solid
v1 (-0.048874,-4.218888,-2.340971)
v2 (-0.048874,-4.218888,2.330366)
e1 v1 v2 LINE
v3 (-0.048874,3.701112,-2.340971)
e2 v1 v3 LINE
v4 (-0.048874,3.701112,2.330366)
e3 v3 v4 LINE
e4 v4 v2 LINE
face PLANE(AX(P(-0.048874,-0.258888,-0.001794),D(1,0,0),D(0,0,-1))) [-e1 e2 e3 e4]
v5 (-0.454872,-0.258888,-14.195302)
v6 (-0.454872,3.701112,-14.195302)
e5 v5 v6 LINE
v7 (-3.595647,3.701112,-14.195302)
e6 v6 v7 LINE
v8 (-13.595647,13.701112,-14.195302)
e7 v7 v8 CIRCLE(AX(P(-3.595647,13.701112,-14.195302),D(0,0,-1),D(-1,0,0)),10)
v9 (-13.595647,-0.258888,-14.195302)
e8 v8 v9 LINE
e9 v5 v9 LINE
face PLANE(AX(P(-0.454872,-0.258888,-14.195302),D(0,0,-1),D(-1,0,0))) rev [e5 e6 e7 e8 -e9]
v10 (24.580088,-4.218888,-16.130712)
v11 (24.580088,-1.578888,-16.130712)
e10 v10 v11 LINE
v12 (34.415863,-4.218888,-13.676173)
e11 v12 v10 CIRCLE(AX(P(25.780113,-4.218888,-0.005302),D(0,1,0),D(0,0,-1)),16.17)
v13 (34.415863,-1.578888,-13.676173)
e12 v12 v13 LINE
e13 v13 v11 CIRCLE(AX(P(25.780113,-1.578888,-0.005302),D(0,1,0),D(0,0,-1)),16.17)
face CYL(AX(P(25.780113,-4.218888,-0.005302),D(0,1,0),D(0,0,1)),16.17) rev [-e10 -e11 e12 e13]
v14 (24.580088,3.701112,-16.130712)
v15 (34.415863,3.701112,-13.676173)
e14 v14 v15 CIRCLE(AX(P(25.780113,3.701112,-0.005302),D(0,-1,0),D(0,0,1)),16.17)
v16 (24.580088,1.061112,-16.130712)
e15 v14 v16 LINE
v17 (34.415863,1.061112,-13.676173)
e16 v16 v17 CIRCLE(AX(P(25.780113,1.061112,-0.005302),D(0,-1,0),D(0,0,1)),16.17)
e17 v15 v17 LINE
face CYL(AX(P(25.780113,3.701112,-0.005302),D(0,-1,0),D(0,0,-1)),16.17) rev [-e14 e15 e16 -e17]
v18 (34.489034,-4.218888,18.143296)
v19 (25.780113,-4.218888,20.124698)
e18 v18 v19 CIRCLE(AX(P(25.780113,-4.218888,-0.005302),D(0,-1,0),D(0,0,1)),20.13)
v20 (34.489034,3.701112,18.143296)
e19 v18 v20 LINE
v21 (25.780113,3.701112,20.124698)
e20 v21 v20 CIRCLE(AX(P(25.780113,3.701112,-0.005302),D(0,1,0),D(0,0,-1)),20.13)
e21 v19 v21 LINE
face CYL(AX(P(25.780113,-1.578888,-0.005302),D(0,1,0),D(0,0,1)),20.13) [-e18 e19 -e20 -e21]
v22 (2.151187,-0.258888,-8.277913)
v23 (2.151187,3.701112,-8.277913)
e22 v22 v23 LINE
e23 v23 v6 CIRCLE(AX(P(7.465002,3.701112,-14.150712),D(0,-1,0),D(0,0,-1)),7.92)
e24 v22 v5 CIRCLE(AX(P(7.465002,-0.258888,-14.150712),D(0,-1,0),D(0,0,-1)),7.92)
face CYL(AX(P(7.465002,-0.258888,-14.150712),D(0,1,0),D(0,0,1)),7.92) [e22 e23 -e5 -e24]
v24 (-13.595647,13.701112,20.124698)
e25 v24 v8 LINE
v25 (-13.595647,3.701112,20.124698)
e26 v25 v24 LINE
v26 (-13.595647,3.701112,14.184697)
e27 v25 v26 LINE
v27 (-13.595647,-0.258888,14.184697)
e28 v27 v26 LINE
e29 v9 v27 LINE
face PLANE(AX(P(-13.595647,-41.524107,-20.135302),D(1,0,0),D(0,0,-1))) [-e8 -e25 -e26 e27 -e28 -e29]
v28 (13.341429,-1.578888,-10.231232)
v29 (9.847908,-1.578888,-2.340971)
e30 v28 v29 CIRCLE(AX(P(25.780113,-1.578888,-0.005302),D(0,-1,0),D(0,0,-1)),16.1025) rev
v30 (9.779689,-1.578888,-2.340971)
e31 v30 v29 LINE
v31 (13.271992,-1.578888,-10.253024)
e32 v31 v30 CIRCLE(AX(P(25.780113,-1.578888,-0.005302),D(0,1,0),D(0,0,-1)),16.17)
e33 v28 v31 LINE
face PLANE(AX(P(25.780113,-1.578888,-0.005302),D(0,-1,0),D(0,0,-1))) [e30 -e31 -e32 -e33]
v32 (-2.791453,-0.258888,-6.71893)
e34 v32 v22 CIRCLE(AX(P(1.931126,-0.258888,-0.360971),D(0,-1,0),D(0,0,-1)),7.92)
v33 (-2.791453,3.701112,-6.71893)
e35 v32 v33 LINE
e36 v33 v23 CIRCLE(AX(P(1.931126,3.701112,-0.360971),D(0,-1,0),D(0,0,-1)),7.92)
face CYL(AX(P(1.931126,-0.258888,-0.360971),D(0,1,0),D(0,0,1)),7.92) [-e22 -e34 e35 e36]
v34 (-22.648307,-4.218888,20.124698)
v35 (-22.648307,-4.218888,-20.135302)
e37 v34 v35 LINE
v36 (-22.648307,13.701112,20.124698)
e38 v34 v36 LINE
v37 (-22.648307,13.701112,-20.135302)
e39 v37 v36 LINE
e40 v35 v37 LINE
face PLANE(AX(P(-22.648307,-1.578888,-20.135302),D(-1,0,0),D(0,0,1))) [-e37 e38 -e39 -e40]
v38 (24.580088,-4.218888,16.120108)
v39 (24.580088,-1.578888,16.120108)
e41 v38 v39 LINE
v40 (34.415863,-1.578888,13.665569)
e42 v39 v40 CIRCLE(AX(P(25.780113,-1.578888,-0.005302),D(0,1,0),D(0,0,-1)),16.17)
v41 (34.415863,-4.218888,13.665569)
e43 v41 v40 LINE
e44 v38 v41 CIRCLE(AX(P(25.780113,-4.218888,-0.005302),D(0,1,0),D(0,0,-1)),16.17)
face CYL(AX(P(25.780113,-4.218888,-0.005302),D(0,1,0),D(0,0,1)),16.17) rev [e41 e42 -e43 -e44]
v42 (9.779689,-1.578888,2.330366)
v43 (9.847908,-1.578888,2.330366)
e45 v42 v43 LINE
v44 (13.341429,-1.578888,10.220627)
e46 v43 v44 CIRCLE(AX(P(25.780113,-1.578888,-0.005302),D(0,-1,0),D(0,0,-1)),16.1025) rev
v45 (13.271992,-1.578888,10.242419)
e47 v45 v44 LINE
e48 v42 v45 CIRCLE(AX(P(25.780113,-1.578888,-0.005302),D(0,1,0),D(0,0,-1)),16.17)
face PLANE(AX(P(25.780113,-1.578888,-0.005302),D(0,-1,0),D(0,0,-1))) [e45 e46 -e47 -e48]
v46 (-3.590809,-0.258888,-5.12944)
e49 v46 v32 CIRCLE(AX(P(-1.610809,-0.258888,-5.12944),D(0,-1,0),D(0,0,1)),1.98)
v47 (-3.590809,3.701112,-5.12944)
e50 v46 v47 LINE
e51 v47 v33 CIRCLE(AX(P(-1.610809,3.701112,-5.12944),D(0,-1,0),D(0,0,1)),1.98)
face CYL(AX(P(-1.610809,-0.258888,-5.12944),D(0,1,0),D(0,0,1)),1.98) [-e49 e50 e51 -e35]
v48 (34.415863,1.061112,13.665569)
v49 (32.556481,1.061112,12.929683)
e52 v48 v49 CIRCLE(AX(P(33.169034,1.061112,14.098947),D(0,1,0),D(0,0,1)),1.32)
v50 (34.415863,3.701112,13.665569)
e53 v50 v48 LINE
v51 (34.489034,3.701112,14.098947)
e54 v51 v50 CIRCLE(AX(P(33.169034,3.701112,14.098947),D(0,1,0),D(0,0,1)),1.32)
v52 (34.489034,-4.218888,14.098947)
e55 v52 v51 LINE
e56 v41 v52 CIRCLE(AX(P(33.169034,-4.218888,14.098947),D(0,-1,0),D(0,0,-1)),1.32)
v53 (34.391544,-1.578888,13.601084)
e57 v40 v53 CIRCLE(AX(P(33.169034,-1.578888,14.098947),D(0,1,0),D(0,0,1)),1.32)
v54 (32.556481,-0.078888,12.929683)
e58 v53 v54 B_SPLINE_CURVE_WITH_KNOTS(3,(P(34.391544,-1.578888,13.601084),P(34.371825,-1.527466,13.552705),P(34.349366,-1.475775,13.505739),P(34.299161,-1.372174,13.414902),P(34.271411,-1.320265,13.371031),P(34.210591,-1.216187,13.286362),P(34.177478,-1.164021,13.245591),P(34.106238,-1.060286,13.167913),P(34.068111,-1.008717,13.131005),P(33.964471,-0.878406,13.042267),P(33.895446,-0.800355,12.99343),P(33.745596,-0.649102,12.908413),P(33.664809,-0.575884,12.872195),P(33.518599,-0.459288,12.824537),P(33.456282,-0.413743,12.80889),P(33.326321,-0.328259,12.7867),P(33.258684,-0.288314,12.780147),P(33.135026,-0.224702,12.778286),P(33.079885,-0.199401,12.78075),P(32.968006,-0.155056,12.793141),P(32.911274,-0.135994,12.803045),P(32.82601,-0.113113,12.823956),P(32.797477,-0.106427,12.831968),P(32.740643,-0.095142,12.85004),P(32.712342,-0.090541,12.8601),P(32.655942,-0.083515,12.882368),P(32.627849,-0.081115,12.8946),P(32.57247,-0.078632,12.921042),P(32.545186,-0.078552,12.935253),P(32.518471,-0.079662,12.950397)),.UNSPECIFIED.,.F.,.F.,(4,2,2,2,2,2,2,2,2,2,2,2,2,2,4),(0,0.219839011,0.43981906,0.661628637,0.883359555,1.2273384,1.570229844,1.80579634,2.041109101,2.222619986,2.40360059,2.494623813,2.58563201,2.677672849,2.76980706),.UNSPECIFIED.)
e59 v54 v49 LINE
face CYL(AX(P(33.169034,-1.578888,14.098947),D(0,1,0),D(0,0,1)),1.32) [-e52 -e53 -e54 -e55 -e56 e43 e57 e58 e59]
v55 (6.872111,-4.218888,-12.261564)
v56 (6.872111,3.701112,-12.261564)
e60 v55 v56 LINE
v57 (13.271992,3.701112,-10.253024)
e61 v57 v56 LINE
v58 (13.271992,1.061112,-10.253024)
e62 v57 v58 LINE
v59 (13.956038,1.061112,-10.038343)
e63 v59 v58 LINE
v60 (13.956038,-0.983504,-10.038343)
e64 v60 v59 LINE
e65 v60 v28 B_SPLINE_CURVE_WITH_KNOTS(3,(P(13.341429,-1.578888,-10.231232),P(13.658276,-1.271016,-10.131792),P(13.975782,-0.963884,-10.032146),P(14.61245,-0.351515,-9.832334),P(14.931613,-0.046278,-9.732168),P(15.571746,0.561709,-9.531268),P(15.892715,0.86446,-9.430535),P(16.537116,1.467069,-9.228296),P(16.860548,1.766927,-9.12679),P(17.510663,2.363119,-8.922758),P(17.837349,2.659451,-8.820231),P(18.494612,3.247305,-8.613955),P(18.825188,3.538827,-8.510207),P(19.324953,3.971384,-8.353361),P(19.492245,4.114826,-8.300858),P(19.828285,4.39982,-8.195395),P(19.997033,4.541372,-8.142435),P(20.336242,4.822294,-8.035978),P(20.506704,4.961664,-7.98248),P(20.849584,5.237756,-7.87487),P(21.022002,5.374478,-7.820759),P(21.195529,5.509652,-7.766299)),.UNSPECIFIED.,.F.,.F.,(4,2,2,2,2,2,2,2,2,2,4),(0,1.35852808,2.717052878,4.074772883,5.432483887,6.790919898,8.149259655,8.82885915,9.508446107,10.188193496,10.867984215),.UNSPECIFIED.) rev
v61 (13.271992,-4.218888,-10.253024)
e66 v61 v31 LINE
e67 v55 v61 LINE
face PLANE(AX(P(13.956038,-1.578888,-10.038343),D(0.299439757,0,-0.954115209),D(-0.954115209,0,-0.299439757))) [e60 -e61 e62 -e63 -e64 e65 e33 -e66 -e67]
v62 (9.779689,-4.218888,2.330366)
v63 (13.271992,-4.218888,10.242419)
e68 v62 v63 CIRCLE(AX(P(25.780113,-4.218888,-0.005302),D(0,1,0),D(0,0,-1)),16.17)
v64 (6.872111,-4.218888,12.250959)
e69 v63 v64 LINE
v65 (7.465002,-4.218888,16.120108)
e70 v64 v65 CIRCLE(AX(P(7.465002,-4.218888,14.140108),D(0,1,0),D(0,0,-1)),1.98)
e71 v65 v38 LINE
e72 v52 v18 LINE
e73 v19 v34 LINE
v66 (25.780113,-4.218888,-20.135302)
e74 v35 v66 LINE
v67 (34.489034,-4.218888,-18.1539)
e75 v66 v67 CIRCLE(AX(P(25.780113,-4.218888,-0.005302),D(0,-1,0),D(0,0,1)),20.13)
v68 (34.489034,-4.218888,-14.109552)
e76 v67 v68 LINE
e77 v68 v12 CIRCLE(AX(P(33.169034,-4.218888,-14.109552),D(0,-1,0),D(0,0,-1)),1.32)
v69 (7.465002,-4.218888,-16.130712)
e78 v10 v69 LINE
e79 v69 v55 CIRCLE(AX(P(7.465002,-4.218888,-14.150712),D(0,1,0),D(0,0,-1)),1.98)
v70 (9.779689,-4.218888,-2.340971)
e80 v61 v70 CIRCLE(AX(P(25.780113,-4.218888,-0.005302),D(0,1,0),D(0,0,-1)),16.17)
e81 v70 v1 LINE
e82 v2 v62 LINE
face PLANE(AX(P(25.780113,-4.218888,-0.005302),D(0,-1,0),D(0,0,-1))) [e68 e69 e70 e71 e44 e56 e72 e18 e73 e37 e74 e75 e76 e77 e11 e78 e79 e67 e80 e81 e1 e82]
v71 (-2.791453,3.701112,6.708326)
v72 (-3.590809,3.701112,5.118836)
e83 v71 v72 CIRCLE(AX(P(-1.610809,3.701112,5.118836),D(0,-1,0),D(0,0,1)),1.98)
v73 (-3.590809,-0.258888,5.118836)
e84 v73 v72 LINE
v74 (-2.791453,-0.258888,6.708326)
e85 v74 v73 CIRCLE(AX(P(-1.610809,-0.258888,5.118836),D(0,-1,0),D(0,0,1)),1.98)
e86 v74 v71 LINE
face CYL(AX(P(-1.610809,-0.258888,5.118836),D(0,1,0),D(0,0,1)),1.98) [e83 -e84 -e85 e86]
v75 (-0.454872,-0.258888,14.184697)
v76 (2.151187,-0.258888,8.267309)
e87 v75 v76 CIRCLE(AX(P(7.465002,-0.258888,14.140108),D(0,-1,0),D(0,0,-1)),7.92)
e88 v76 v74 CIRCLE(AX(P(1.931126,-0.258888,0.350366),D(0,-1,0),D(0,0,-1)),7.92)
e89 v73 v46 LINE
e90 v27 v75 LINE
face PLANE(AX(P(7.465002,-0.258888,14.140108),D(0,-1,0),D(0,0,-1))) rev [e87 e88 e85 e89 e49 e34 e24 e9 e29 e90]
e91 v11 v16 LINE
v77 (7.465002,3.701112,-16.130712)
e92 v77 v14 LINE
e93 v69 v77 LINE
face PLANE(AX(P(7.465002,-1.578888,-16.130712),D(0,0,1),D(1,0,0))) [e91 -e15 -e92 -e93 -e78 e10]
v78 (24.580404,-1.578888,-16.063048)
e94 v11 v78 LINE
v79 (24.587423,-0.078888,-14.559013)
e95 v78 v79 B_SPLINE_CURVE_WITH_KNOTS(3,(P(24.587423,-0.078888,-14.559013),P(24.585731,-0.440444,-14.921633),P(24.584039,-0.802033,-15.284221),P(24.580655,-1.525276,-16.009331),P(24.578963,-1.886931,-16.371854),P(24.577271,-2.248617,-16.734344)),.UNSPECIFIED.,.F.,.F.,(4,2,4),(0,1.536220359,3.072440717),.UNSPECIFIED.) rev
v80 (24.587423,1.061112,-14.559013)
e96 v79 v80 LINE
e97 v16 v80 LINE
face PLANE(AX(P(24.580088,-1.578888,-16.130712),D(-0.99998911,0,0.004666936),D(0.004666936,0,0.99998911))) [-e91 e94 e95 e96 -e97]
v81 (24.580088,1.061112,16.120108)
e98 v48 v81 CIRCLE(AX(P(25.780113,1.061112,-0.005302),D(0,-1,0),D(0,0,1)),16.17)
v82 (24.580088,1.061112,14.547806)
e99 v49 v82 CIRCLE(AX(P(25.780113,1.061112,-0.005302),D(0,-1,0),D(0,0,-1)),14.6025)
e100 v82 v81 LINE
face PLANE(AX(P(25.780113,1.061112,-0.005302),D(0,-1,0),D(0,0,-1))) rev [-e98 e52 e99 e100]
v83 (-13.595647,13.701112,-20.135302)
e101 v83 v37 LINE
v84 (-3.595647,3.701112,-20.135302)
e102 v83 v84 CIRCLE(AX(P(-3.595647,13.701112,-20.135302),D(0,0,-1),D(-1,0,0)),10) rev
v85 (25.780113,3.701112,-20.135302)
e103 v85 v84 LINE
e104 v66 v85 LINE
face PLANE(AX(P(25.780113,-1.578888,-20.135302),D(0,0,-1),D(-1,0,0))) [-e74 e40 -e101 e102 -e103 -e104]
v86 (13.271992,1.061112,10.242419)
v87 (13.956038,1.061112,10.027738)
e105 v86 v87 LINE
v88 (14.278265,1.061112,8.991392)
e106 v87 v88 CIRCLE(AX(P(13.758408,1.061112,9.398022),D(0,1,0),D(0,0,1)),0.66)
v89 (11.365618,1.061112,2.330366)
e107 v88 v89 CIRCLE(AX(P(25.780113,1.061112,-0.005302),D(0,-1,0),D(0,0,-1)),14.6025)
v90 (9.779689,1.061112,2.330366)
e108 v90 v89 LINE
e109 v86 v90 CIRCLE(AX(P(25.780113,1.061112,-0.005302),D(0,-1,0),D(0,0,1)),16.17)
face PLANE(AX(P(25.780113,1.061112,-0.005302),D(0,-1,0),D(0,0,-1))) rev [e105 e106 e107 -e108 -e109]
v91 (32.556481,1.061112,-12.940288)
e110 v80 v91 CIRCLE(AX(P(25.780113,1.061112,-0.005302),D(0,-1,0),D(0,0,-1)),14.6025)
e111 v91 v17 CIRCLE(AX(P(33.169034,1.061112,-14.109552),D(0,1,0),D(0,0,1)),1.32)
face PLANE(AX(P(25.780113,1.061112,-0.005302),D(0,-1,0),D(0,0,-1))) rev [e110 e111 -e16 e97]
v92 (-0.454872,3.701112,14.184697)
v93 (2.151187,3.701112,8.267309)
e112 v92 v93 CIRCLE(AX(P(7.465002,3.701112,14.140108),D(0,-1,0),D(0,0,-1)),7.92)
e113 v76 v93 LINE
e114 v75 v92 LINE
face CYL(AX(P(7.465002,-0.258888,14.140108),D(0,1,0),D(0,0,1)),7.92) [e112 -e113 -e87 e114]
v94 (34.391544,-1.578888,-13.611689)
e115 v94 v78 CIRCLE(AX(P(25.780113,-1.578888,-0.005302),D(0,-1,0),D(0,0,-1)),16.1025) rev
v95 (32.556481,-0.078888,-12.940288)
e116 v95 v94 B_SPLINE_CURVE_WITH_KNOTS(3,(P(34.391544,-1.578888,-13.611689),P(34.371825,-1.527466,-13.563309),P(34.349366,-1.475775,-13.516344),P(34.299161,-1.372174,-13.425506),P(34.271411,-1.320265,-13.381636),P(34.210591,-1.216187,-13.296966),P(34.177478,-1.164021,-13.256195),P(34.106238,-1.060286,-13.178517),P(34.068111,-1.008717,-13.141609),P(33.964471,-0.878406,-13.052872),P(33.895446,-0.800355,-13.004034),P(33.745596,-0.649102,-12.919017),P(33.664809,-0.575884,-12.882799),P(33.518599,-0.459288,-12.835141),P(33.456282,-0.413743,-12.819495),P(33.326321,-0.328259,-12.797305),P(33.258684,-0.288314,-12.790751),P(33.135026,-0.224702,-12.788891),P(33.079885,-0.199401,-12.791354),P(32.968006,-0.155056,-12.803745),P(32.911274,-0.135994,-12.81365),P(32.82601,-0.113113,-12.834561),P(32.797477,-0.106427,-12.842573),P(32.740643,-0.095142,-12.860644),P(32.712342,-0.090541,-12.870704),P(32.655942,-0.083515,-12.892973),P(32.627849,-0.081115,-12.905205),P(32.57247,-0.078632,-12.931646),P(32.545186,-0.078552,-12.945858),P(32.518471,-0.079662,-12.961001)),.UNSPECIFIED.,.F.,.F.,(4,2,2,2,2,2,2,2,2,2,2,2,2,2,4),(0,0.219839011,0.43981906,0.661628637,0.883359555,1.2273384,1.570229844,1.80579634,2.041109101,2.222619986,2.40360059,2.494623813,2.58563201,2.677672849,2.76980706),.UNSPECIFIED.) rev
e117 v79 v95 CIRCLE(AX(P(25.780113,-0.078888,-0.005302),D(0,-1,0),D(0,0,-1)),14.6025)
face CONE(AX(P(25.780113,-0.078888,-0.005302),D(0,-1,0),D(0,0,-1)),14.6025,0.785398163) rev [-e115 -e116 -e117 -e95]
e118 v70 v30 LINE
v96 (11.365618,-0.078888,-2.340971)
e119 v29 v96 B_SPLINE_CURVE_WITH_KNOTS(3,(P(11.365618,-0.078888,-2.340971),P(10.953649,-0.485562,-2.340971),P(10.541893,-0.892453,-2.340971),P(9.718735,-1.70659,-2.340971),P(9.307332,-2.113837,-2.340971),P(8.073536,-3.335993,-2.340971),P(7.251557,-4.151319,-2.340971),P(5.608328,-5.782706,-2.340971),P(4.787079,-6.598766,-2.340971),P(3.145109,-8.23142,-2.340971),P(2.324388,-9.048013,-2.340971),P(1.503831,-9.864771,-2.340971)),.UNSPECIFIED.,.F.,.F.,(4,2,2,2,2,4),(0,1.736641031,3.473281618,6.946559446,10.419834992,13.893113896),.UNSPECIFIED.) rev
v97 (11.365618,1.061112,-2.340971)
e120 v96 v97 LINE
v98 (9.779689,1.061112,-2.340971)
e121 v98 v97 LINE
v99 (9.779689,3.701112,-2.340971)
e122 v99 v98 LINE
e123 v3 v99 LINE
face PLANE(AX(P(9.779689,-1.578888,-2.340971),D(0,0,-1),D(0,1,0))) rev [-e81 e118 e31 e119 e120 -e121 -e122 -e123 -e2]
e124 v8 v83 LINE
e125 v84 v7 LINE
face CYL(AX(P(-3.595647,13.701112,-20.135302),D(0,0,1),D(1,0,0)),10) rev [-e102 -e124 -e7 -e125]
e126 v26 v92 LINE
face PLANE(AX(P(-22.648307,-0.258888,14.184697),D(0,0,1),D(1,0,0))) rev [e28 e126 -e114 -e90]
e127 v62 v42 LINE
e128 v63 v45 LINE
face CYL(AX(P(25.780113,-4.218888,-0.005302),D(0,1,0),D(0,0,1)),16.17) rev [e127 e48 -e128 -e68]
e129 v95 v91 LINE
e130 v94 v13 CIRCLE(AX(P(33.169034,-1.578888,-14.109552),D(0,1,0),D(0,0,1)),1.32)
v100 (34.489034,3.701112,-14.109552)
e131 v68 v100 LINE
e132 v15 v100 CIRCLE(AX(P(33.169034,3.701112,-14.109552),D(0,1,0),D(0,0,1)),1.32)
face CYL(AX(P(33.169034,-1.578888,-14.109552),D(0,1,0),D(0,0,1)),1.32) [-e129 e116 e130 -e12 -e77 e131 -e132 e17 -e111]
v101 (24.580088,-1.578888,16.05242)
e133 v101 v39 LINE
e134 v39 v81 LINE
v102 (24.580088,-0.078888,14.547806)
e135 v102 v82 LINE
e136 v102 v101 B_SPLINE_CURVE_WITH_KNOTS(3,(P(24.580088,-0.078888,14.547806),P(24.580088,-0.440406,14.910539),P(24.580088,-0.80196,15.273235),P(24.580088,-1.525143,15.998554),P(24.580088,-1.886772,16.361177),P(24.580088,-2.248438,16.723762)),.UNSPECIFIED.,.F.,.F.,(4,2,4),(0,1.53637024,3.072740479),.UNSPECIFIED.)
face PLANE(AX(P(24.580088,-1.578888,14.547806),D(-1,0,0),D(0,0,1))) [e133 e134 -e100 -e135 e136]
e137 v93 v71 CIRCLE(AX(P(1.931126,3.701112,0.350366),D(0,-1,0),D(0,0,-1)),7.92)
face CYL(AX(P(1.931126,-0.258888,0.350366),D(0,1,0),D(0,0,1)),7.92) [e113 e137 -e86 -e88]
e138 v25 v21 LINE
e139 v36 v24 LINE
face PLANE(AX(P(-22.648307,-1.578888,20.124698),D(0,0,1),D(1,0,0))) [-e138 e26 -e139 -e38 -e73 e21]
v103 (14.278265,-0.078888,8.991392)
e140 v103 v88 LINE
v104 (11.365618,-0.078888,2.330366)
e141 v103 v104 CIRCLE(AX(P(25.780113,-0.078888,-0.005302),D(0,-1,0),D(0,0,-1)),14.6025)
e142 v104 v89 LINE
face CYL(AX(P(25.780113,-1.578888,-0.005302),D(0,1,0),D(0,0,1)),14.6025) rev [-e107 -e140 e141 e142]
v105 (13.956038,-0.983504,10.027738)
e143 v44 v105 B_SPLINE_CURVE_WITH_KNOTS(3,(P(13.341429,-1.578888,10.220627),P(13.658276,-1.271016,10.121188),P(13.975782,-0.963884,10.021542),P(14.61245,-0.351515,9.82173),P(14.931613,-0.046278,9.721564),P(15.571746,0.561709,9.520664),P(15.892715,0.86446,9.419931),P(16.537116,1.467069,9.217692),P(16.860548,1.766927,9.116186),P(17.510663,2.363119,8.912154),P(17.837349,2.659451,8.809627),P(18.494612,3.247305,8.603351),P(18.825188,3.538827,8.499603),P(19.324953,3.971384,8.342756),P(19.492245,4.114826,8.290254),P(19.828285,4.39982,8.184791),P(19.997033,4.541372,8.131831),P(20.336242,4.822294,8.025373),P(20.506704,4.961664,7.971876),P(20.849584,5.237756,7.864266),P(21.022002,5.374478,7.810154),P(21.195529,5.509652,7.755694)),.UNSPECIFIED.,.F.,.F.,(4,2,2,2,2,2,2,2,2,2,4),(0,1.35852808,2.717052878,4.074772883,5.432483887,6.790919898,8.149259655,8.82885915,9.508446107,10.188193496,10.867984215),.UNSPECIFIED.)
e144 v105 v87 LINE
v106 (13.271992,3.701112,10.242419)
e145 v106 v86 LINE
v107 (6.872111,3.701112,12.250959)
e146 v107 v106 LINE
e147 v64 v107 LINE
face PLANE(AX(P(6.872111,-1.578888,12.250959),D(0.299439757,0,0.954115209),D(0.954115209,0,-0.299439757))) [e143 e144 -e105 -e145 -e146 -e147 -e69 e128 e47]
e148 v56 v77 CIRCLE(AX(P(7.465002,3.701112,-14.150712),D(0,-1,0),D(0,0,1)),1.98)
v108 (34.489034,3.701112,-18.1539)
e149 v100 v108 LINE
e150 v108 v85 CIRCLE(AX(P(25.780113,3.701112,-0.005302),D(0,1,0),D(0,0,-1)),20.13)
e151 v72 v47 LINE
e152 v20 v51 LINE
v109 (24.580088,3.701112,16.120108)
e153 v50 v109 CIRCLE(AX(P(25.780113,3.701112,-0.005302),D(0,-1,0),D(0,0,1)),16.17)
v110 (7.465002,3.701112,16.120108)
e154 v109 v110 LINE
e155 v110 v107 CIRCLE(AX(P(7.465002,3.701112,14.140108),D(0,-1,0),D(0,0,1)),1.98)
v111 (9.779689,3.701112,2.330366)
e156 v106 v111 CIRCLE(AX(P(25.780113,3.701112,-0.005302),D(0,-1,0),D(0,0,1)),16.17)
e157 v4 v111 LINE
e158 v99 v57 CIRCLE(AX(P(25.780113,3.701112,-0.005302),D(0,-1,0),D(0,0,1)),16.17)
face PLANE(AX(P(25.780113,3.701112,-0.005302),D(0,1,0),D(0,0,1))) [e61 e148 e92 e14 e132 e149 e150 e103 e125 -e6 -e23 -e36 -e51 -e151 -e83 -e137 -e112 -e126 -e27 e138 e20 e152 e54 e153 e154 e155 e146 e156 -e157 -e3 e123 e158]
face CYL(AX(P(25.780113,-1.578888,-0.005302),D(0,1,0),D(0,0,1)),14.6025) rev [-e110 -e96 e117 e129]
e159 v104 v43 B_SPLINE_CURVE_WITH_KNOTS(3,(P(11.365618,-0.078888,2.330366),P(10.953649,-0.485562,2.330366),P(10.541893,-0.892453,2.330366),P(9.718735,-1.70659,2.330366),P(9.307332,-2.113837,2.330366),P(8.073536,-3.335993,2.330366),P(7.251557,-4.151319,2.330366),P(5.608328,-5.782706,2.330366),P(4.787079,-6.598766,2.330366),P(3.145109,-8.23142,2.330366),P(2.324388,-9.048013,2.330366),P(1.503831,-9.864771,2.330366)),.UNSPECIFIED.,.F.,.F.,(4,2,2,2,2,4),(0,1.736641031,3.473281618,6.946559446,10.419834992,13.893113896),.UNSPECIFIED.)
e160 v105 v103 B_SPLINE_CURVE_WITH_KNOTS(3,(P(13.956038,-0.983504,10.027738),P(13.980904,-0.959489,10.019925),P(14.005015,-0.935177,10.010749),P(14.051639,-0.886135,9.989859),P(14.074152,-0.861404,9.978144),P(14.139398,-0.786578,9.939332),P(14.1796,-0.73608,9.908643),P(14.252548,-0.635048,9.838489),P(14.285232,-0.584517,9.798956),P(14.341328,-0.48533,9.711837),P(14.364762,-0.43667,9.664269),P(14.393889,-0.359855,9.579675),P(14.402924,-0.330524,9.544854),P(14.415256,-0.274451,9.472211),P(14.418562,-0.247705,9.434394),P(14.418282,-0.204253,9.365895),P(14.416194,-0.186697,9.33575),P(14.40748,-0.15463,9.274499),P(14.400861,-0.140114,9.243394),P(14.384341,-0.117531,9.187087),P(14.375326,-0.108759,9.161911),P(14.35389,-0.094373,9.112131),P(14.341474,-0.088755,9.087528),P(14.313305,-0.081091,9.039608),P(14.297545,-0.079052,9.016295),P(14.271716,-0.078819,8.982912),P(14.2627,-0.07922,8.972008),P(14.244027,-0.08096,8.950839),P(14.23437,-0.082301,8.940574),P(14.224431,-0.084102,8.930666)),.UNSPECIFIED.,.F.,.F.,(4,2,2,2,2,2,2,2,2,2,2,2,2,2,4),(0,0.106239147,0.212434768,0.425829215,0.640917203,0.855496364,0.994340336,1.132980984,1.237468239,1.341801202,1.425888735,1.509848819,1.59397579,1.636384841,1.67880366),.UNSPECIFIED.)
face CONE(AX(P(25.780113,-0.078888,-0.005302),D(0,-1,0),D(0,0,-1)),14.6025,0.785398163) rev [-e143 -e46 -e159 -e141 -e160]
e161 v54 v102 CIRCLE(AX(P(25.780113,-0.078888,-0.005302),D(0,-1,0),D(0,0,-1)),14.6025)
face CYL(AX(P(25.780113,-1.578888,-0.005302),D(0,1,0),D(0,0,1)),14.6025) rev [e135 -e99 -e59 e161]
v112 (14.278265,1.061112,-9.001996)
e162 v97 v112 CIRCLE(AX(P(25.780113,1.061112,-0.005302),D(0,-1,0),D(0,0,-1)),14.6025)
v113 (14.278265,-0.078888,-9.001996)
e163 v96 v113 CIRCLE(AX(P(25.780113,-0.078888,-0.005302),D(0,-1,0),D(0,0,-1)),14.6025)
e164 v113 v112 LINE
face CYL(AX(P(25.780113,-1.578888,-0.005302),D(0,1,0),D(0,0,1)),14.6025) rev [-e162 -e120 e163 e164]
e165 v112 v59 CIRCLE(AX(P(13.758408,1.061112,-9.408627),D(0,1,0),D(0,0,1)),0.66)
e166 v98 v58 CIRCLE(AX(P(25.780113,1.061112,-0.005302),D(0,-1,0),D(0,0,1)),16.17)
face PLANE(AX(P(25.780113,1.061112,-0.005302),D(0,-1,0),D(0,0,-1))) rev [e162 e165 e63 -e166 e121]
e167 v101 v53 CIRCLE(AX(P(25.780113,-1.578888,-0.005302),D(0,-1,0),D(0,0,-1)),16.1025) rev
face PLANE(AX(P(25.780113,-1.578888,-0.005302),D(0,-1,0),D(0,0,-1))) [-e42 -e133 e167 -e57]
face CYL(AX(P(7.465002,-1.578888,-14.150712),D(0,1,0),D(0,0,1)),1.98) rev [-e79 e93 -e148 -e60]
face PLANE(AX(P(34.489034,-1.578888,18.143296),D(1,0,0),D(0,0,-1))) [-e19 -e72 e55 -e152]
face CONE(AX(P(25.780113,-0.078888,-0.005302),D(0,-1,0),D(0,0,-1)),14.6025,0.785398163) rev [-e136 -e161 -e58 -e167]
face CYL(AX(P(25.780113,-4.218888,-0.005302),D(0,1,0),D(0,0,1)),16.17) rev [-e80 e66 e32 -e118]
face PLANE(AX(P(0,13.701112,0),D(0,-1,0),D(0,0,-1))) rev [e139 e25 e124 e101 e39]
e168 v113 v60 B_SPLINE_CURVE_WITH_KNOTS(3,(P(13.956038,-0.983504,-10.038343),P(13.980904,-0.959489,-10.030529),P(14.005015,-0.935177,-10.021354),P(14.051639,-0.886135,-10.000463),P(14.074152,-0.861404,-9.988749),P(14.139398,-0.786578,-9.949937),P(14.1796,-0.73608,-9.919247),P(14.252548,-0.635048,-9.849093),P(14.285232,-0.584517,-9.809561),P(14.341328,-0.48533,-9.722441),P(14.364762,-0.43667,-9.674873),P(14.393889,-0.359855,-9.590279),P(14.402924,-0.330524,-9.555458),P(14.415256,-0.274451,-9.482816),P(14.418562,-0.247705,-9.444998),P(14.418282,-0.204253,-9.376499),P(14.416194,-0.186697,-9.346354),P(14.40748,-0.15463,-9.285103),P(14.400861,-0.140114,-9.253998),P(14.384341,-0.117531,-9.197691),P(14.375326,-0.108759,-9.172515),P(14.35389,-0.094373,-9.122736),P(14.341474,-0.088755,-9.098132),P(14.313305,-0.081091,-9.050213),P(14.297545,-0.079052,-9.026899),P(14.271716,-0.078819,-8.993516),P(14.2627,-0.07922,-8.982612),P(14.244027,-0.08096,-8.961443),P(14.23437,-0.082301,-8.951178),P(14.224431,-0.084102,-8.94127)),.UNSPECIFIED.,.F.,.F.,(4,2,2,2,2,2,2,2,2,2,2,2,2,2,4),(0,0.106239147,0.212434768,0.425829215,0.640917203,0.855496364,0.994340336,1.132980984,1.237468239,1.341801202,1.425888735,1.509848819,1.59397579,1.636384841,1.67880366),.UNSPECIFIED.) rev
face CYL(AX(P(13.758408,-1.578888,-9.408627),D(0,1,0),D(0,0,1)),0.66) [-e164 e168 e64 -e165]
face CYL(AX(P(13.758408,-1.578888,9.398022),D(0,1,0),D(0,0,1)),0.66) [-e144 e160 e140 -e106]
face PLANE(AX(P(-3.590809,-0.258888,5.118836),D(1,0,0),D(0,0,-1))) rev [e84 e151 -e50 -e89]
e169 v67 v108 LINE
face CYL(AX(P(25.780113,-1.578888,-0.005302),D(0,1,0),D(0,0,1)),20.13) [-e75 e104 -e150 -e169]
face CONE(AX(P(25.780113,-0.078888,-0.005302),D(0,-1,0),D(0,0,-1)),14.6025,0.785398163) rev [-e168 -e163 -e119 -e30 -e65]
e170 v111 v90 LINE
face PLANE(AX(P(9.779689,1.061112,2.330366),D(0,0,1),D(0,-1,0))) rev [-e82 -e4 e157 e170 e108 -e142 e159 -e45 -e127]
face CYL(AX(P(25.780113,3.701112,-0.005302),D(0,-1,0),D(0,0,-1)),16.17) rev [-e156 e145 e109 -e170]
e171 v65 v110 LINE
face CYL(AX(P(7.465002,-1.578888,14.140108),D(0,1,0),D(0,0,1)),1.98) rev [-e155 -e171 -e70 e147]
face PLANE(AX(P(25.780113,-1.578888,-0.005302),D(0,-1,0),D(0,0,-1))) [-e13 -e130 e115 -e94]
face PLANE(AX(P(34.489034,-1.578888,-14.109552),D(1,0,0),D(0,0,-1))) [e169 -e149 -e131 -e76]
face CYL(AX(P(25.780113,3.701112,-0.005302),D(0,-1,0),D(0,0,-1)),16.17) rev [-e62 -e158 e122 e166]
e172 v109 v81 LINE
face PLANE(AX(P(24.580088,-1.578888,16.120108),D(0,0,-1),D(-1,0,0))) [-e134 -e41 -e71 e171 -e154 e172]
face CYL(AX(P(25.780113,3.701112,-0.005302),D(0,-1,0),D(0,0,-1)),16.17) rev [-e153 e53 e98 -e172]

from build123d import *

# Parameters (mm, degrees)
BOSS_EXTRUDE1_DEPTH             = 4
SKETCH2_W                       = 7.077783737
SKETCH2_H                       = 4
CUT_EXTRUDE1_DEPTH              = 2.402922374
BOSS_EXTRUDE2_START             = 4
BOSS_EXTRUDE2_DEPTH             = 4
SKETCH4_W                       = 7.077783737
SKETCH4_H                       = 8
CUT_EXTRUDE2_DEPTH              = 14.891763442
BOSS_EXTRUDE3_DEPTH             = 4
CUT_EXTRUDE3_DEPTH              = 6
SCALE1_SCALE                    = 0.6
SCALE2_SCALE                    = 1.1
CHAMFER2_ANGLE                  = 32.170804
CHAMFER3_ANGLE                  = 32.170804
CHAMFER4_ANGLE                  = 37.089833
SKETCH9_W                       = 9.052660039
SKETCH9_H                       = 40.26
BOSS_EXTRUDE4_DEPTH             = 10
BOSS_EXTRUDE4_DIRECTION_2_REACH = 42.714
FILLET1_R                       = 10


with BuildPart() as part:
    # Sketch1 → Boss-Extrude1 (new body)
    with BuildSketch(Plane(origin=(0, 2, 0), x_dir=(1, 0, 0), z_dir=(0, 1, 0))):
        with BuildLine():
            Line((17.294685816, -3.533576913), (17.294685816, 3.544206824))
            ThreePointArc((17.294685816, 3.544206824), (18.863114644, 8.869467938), (21.707787317, 13.636669664))
            ThreePointArc((21.707787317, 13.636669664), (21.87503123, 14.549681712), (21.219564158, 15.2068913))
            Line((21.219564158, 15.2068913), (10.486342132, 18.5754084))
            ThreePointArc((10.486342132, 18.5754084), (8.419274676, 21.892156447), (11.384661403, 24.437754026))
            Line((11.384661403, 24.437754026), (37.31661015, 24.437754026))
            Line((37.31661015, 24.437754026), (37.327723934, 22.056391914))
            ThreePointArc((37.327723934, 22.056391914), (43.539057979, 21.687528752), (49.402053126, 19.603777671))
            ThreePointArc((49.402053126, 19.603777671), (51.365484655, 19.664217825), (52.33016375, 21.37539012))
            Line((52.33016375, 21.37539012), (52.33016375, 27.503190326))
            ThreePointArc((52.33016375, 27.503190326), (45.90109867, 29.745314945), (39.134829344, 30.505314955))
            Line((39.134829344, 30.505314955), (-34.24156443, 30.505314955))
            Line((-34.24156443, 30.505314955), (-34.24156443, -30.494685045))
            Line((-34.24156443, -30.494685045), (39.134829344, -30.494685045))
            ThreePointArc((39.134829344, -30.494685045), (45.90109867, -29.734685035), (52.33016375, -27.492560416))
            Line((52.33016375, -27.492560416), (52.33016375, -21.36476021))
            ThreePointArc((52.33016375, -21.36476021), (51.365484655, -19.653587914), (49.402053126, -19.593147761))
            ThreePointArc((49.402053126, -19.593147761), (43.533593788, -21.678008046), (37.31661015, -22.044848399))
            Line((37.31661015, -22.044848399), (37.31661015, -24.427124116))
            Line((37.31661015, -24.427124116), (11.384661403, -24.427124116))
            ThreePointArc((11.384661403, -24.427124116), (8.419274676, -21.881526536), (10.486342132, -18.564778489))
            Line((10.486342132, -18.564778489), (21.219564158, -15.19626139))
            ThreePointArc((21.219564158, -15.19626139), (21.87503123, -14.539051801), (21.707787317, -13.626039753))
            ThreePointArc((21.707787317, -13.626039753), (18.863114644, -8.858838027), (17.294685816, -3.533576913))
        make_face()
    extrude(amount=-BOSS_EXTRUDE1_DEPTH)

    # Sketch2 → Cut-Extrude1 (cut)
    with BuildSketch(Plane(origin=(17.294685816, 0, 0), x_dir=(0, 0, -1), z_dir=(1, 0, 0))):
        with Locations((0.005314956, 0)):
            Rectangle(SKETCH2_W, SKETCH2_H)
    extrude(amount=-CUT_EXTRUDE1_DEPTH, mode=Mode.SUBTRACT)

    # Sketch3 → Boss-Extrude2 (add)
    with BuildSketch(Plane(origin=(0, 2, 0), x_dir=(-1, 0, 0), z_dir=(0, 1, 0)).offset(BOSS_EXTRUDE2_START)):
        with BuildLine():
            Line((-14.891763442, -3.544206824), (-14.891763442, 3.533576913))
            ThreePointArc((-14.891763442, 3.533576913), (-16.721112086, 9.887878597), (-20.183130277, 15.52153606))
            Line((-20.183130277, 15.52153606), (-10.486342132, 18.564778489))
            ThreePointArc((-10.486342132, 18.564778489), (-8.419274676, 21.881526536), (-11.384661403, 24.427124116))
            Line((-11.384661403, 24.427124116), (-37.31661015, 24.427124116))
            ThreePointArc((-37.31661015, 24.427124116), (-45.066931496, 23.76567922), (-52.219299017, 20.708126414))
            ThreePointArc((-52.219299017, 20.708126414), (-52.302252812, 21.031796649), (-52.33016375, 21.36476021))
            Line((-52.33016375, 21.36476021), (-52.33016375, 27.492560416))
            ThreePointArc((-52.33016375, 27.492560416), (-45.90109867, 29.734685035), (-39.134829344, 30.494685045))
            Line((-39.134829344, 30.494685045), (34.241565294, 30.494685045))
            Line((34.241565294, 30.494685045), (34.241565294, -30.505314955))
            Line((34.241565294, -30.505314955), (-39.134829344, -30.505314955))
            ThreePointArc((-39.134829344, -30.505314955), (-45.90109867, -29.745314945), (-52.33016375, -27.503190326))
            Line((-52.33016375, -27.503190326), (-52.33016375, -21.37539012))
            ThreePointArc((-52.33016375, -21.37539012), (-52.302252812, -21.04242656), (-52.219299017, -20.718756325))
            ThreePointArc((-52.219299017, -20.718756325), (-45.066931496, -23.77630913), (-37.31661015, -24.437754026))
            Line((-37.31661015, -24.437754026), (-11.384661403, -24.437754026))
            ThreePointArc((-11.384661403, -24.437754026), (-8.419274676, -21.892156447), (-10.486342132, -18.5754084))
            Line((-10.486342132, -18.5754084), (-20.183130277, -15.53216597))
            ThreePointArc((-20.183130277, -15.53216597), (-16.721112086, -9.898508508), (-14.891763442, -3.544206824))
        make_face()
    extrude(amount=-BOSS_EXTRUDE2_DEPTH)

    # Sketch4 → Cut-Extrude2 (cut)
    with BuildSketch(Plane(origin=(14.891763442, 0, 0), x_dir=(0, 0, -1), z_dir=(1, 0, 0))):
        with Locations((0.005314956, 2)):
            Rectangle(SKETCH4_W, SKETCH4_H)
    extrude(amount=-CUT_EXTRUDE2_DEPTH, mode=Mode.SUBTRACT)

    # Sketch5 → Boss-Extrude3 (add)
    with BuildSketch(Plane.XZ.offset(2)):
        with BuildLine():
            Line((37.31661015, 24.427124116), (11.384661403, 24.427124116))
            ThreePointArc((11.384661403, 24.427124116), (8.419274676, 21.881526536), (10.486342132, 18.564778489))
            Line((10.486342132, 18.564778489), (20.183130277, 15.52153606))
            ThreePointArc((20.183130277, 15.52153606), (16.721112086, 9.887878597), (14.891763442, 3.533576913))
            Line((14.891763442, 3.533576913), (0, 3.533576913))
            Line((0, 3.533576913), (0, -3.544206824))
            Line((0, -3.544206824), (14.891763442, -3.544206824))
            ThreePointArc((14.891763442, -3.544206824), (16.721112086, -9.898508508), (20.183130277, -15.53216597))
            Line((20.183130277, -15.53216597), (10.486342132, -18.5754084))
            ThreePointArc((10.486342132, -18.5754084), (8.419274676, -21.892156447), (11.384661403, -24.437754026))
            Line((11.384661403, -24.437754026), (37.31661015, -24.437754026))
            ThreePointArc((37.31661015, -24.437754026), (45.066931496, -23.77630913), (52.219299017, -20.718756325))
            ThreePointArc((52.219299017, -20.718756325), (52.302252812, -21.04242656), (52.33016375, -21.37539012))
            Line((52.33016375, -21.37539012), (52.33016375, -27.503190326))
            ThreePointArc((52.33016375, -27.503190326), (45.90109867, -29.745314945), (39.134829344, -30.505314955))
            Line((39.134829344, -30.505314955), (-34.241565294, -30.505314955))
            Line((-34.241565294, -30.505314955), (-34.241565294, 30.494685045))
            Line((-34.241565294, 30.494685045), (39.134829344, 30.494685045))
            ThreePointArc((39.134829344, 30.494685045), (45.90109867, 29.734685035), (52.33016375, 27.492560416))
            Line((52.33016375, 27.492560416), (52.33016375, 21.36476021))
            ThreePointArc((52.33016375, 21.36476021), (52.302252812, 21.031796649), (52.219299017, 20.708126414))
            ThreePointArc((52.219299017, 20.708126414), (45.066931496, 23.76567922), (37.31661015, 24.427124116))
        make_face()
    extrude(amount=BOSS_EXTRUDE3_DEPTH)

    # Sketch6 → Cut-Extrude3 (cut)
    with BuildSketch(Plane(origin=(0, 6, 0), x_dir=(-1, 0, 0), z_dir=(0, 1, 0))):
        with BuildLine():
            Line((34.241565294, 21.494683919), (0.615148415, 21.494683919))
            ThreePointArc((0.615148415, 21.494683919), (-0.40252933, 16.590516303), (-3.333426268, 12.528943807))
            ThreePointArc((-3.333426268, 12.528943807), (0.609678883, 11.977798965), (4.155422589, 10.166848817))
            ThreePointArc((4.155422589, 10.166848817), (5.046731763, 9.106387113), (5.366566942, 7.758530841))
            Line((5.366566942, 7.758530841), (5.366566942, -7.769160752))
            ThreePointArc((5.366566942, -7.769160752), (5.046731763, -9.117017023), (4.155422589, -10.177478728))
            ThreePointArc((4.155422589, -10.177478728), (0.609678883, -11.988428875), (-3.333426268, -12.539573718))
            ThreePointArc((-3.333426268, -12.539573718), (-0.402529103, -16.601146729), (0.615148409, -21.505314955))
            Line((0.615148409, -21.505314955), (34.241565294, -21.505314955))
            Line((34.241565294, -21.505314955), (34.241565294, 21.494683919))
        make_face()
    extrude(amount=-CUT_EXTRUDE3_DEPTH, mode=Mode.SUBTRACT)


with BuildPart() as part_1:
    # Scale1: scaled about (-0.143748337, -0.76143553, -0.005277361)
    add(part.part.scale(SCALE1_SCALE).moved(Location((-0.057499335, -0.304574212, -0.002110944))))


with BuildPart() as part_2:
    # Scale2: scaled about (-0.143748337, -0.76143553, -0.005277361)
    add(part_1.part.scale(SCALE2_SCALE).moved(Location((0.014374834, 0.076143553, 0.000527736))))

    # Chamfer2: read off the stored shape, not the designer's step
    # Chamfer2 outline → Chamfer2 (revolve, cut)
    with BuildSketch(Plane(origin=(25.780112964, 0, -0.005302173), x_dir=(-0.9894243177123465, 0, 0.14505005866754295), z_dir=(-0.14505005866754295, 0, -0.9894243177123465))):
        Polygon((16.1025, -1.578888079), (14.602499776, -0.078887855), (14.602499776, -1.578888079), align=None)
    revolve(axis=Axis((25.780112964, 0, -0.005302173), (0, 1, 0)), revolution_arc=CHAMFER2_ANGLE, mode=Mode.SUBTRACT)

    # Chamfer3: read off the stored shape, not the designer's step
    # Chamfer3 outline → Chamfer3 (revolve, cut)
    with BuildSketch(Plane(origin=(25.780112964, 0, -0.005302173), x_dir=(-0.7602814738740017, 0, -0.6495937811309278), z_dir=(0.6495937811309278, 0, -0.7602814738740017))):
        Polygon((16.1025, -1.578888079), (14.602499776, -0.078887855), (14.602499776, -1.578888079), align=None)
    revolve(axis=Axis((25.780112964, 0, -0.005302173), (0, 1, 0)), revolution_arc=CHAMFER3_ANGLE, mode=Mode.SUBTRACT)

    # Chamfer4: read off the stored shape, not the designer's step
    # Chamfer4 outline → Chamfer4 (revolve, cut)
    with BuildSketch(Plane(origin=(25.780112964, 0, -0.005302173), x_dir=(0.5358984482336857, 0, -0.8442824486987324), z_dir=(0.8442824486987324, 0, 0.5358984482336857))):
        Polygon((16.1025, -1.578888079), (14.602495102, -0.078883181), (14.602495102, -1.578888079), align=None)
    revolve(axis=Axis((25.780112964, 0, -0.005302173), (0, 1, 0)), revolution_arc=CHAMFER4_ANGLE, mode=Mode.SUBTRACT)

    # Chamfer5: read off the stored shape, not the designer's step
    # Chamfer5 outline → Chamfer5 (revolve, cut)
    with BuildSketch(Plane(origin=(25.780112964, 0, -0.005302173), x_dir=(1, 0, 0), z_dir=(0, 0, 1))):
        Polygon((16.1025, -1.578888079), (14.602495102, -0.078883181), (14.602495102, -1.578888079), align=None)
    revolve(axis=Axis((25.780112964, 0, -0.005302173), (0, 1, 0)), mode=Mode.SUBTRACT)

    # Sketch9 → Boss-Extrude4 (add)
    with BuildSketch(Plane(origin=(0, 3.701111921, 0), x_dir=(1, 0, 0), z_dir=(0, 1, 0))):
        with Locations((-18.121977477, 0.005302173)):
            Rectangle(SKETCH9_W, SKETCH9_H)
    extrude(amount=BOSS_EXTRUDE4_DEPTH)

    # Boss-Extrude4 direction 2: up to this face of the body (flat: up to its plane)
    boss_extrude4_direction_2_end = Plane(part_2.part.faces().sort_by_distance((-12.071218374, -0.25888808, -0.005302566))[0])
    # Sketch9 → Boss-Extrude4 direction 2 (add, up to the picked face)
    with BuildSketch(Plane(origin=(0, 3.701111921, 0), x_dir=(1, 0, 0), z_dir=(0, 1, 0)), mode=Mode.PRIVATE) as boss_extrude4_direction_2_sk1:
        with Locations((-18.121977477, 0.005302173)):
            Rectangle(SKETCH9_W, SKETCH9_H)
    boss_extrude4_direction_2_tool1 = split(extrude(boss_extrude4_direction_2_sk1.sketch, amount=-BOSS_EXTRUDE4_DIRECTION_2_REACH, mode=Mode.PRIVATE), bisect_by=boss_extrude4_direction_2_end, keep=Keep.BOTH, mode=Mode.PRIVATE)
    add(boss_extrude4_direction_2_tool1.solids().sort_by(Axis((-18.121977, 3.701112, -0.005302), (0, -1, 0)))[0])

    # Fillet1
    fillet1_edges = [part_2.edges().sort_by_distance(p)[0] for p in [
        (-13.595647458, 3.701111921, -17.165302173),
    ]]
    fillet(fillet1_edges, radius=FILLET1_R - 0.0001)  # a hair under: the kernel refuses the full size


solid = part_2.part
